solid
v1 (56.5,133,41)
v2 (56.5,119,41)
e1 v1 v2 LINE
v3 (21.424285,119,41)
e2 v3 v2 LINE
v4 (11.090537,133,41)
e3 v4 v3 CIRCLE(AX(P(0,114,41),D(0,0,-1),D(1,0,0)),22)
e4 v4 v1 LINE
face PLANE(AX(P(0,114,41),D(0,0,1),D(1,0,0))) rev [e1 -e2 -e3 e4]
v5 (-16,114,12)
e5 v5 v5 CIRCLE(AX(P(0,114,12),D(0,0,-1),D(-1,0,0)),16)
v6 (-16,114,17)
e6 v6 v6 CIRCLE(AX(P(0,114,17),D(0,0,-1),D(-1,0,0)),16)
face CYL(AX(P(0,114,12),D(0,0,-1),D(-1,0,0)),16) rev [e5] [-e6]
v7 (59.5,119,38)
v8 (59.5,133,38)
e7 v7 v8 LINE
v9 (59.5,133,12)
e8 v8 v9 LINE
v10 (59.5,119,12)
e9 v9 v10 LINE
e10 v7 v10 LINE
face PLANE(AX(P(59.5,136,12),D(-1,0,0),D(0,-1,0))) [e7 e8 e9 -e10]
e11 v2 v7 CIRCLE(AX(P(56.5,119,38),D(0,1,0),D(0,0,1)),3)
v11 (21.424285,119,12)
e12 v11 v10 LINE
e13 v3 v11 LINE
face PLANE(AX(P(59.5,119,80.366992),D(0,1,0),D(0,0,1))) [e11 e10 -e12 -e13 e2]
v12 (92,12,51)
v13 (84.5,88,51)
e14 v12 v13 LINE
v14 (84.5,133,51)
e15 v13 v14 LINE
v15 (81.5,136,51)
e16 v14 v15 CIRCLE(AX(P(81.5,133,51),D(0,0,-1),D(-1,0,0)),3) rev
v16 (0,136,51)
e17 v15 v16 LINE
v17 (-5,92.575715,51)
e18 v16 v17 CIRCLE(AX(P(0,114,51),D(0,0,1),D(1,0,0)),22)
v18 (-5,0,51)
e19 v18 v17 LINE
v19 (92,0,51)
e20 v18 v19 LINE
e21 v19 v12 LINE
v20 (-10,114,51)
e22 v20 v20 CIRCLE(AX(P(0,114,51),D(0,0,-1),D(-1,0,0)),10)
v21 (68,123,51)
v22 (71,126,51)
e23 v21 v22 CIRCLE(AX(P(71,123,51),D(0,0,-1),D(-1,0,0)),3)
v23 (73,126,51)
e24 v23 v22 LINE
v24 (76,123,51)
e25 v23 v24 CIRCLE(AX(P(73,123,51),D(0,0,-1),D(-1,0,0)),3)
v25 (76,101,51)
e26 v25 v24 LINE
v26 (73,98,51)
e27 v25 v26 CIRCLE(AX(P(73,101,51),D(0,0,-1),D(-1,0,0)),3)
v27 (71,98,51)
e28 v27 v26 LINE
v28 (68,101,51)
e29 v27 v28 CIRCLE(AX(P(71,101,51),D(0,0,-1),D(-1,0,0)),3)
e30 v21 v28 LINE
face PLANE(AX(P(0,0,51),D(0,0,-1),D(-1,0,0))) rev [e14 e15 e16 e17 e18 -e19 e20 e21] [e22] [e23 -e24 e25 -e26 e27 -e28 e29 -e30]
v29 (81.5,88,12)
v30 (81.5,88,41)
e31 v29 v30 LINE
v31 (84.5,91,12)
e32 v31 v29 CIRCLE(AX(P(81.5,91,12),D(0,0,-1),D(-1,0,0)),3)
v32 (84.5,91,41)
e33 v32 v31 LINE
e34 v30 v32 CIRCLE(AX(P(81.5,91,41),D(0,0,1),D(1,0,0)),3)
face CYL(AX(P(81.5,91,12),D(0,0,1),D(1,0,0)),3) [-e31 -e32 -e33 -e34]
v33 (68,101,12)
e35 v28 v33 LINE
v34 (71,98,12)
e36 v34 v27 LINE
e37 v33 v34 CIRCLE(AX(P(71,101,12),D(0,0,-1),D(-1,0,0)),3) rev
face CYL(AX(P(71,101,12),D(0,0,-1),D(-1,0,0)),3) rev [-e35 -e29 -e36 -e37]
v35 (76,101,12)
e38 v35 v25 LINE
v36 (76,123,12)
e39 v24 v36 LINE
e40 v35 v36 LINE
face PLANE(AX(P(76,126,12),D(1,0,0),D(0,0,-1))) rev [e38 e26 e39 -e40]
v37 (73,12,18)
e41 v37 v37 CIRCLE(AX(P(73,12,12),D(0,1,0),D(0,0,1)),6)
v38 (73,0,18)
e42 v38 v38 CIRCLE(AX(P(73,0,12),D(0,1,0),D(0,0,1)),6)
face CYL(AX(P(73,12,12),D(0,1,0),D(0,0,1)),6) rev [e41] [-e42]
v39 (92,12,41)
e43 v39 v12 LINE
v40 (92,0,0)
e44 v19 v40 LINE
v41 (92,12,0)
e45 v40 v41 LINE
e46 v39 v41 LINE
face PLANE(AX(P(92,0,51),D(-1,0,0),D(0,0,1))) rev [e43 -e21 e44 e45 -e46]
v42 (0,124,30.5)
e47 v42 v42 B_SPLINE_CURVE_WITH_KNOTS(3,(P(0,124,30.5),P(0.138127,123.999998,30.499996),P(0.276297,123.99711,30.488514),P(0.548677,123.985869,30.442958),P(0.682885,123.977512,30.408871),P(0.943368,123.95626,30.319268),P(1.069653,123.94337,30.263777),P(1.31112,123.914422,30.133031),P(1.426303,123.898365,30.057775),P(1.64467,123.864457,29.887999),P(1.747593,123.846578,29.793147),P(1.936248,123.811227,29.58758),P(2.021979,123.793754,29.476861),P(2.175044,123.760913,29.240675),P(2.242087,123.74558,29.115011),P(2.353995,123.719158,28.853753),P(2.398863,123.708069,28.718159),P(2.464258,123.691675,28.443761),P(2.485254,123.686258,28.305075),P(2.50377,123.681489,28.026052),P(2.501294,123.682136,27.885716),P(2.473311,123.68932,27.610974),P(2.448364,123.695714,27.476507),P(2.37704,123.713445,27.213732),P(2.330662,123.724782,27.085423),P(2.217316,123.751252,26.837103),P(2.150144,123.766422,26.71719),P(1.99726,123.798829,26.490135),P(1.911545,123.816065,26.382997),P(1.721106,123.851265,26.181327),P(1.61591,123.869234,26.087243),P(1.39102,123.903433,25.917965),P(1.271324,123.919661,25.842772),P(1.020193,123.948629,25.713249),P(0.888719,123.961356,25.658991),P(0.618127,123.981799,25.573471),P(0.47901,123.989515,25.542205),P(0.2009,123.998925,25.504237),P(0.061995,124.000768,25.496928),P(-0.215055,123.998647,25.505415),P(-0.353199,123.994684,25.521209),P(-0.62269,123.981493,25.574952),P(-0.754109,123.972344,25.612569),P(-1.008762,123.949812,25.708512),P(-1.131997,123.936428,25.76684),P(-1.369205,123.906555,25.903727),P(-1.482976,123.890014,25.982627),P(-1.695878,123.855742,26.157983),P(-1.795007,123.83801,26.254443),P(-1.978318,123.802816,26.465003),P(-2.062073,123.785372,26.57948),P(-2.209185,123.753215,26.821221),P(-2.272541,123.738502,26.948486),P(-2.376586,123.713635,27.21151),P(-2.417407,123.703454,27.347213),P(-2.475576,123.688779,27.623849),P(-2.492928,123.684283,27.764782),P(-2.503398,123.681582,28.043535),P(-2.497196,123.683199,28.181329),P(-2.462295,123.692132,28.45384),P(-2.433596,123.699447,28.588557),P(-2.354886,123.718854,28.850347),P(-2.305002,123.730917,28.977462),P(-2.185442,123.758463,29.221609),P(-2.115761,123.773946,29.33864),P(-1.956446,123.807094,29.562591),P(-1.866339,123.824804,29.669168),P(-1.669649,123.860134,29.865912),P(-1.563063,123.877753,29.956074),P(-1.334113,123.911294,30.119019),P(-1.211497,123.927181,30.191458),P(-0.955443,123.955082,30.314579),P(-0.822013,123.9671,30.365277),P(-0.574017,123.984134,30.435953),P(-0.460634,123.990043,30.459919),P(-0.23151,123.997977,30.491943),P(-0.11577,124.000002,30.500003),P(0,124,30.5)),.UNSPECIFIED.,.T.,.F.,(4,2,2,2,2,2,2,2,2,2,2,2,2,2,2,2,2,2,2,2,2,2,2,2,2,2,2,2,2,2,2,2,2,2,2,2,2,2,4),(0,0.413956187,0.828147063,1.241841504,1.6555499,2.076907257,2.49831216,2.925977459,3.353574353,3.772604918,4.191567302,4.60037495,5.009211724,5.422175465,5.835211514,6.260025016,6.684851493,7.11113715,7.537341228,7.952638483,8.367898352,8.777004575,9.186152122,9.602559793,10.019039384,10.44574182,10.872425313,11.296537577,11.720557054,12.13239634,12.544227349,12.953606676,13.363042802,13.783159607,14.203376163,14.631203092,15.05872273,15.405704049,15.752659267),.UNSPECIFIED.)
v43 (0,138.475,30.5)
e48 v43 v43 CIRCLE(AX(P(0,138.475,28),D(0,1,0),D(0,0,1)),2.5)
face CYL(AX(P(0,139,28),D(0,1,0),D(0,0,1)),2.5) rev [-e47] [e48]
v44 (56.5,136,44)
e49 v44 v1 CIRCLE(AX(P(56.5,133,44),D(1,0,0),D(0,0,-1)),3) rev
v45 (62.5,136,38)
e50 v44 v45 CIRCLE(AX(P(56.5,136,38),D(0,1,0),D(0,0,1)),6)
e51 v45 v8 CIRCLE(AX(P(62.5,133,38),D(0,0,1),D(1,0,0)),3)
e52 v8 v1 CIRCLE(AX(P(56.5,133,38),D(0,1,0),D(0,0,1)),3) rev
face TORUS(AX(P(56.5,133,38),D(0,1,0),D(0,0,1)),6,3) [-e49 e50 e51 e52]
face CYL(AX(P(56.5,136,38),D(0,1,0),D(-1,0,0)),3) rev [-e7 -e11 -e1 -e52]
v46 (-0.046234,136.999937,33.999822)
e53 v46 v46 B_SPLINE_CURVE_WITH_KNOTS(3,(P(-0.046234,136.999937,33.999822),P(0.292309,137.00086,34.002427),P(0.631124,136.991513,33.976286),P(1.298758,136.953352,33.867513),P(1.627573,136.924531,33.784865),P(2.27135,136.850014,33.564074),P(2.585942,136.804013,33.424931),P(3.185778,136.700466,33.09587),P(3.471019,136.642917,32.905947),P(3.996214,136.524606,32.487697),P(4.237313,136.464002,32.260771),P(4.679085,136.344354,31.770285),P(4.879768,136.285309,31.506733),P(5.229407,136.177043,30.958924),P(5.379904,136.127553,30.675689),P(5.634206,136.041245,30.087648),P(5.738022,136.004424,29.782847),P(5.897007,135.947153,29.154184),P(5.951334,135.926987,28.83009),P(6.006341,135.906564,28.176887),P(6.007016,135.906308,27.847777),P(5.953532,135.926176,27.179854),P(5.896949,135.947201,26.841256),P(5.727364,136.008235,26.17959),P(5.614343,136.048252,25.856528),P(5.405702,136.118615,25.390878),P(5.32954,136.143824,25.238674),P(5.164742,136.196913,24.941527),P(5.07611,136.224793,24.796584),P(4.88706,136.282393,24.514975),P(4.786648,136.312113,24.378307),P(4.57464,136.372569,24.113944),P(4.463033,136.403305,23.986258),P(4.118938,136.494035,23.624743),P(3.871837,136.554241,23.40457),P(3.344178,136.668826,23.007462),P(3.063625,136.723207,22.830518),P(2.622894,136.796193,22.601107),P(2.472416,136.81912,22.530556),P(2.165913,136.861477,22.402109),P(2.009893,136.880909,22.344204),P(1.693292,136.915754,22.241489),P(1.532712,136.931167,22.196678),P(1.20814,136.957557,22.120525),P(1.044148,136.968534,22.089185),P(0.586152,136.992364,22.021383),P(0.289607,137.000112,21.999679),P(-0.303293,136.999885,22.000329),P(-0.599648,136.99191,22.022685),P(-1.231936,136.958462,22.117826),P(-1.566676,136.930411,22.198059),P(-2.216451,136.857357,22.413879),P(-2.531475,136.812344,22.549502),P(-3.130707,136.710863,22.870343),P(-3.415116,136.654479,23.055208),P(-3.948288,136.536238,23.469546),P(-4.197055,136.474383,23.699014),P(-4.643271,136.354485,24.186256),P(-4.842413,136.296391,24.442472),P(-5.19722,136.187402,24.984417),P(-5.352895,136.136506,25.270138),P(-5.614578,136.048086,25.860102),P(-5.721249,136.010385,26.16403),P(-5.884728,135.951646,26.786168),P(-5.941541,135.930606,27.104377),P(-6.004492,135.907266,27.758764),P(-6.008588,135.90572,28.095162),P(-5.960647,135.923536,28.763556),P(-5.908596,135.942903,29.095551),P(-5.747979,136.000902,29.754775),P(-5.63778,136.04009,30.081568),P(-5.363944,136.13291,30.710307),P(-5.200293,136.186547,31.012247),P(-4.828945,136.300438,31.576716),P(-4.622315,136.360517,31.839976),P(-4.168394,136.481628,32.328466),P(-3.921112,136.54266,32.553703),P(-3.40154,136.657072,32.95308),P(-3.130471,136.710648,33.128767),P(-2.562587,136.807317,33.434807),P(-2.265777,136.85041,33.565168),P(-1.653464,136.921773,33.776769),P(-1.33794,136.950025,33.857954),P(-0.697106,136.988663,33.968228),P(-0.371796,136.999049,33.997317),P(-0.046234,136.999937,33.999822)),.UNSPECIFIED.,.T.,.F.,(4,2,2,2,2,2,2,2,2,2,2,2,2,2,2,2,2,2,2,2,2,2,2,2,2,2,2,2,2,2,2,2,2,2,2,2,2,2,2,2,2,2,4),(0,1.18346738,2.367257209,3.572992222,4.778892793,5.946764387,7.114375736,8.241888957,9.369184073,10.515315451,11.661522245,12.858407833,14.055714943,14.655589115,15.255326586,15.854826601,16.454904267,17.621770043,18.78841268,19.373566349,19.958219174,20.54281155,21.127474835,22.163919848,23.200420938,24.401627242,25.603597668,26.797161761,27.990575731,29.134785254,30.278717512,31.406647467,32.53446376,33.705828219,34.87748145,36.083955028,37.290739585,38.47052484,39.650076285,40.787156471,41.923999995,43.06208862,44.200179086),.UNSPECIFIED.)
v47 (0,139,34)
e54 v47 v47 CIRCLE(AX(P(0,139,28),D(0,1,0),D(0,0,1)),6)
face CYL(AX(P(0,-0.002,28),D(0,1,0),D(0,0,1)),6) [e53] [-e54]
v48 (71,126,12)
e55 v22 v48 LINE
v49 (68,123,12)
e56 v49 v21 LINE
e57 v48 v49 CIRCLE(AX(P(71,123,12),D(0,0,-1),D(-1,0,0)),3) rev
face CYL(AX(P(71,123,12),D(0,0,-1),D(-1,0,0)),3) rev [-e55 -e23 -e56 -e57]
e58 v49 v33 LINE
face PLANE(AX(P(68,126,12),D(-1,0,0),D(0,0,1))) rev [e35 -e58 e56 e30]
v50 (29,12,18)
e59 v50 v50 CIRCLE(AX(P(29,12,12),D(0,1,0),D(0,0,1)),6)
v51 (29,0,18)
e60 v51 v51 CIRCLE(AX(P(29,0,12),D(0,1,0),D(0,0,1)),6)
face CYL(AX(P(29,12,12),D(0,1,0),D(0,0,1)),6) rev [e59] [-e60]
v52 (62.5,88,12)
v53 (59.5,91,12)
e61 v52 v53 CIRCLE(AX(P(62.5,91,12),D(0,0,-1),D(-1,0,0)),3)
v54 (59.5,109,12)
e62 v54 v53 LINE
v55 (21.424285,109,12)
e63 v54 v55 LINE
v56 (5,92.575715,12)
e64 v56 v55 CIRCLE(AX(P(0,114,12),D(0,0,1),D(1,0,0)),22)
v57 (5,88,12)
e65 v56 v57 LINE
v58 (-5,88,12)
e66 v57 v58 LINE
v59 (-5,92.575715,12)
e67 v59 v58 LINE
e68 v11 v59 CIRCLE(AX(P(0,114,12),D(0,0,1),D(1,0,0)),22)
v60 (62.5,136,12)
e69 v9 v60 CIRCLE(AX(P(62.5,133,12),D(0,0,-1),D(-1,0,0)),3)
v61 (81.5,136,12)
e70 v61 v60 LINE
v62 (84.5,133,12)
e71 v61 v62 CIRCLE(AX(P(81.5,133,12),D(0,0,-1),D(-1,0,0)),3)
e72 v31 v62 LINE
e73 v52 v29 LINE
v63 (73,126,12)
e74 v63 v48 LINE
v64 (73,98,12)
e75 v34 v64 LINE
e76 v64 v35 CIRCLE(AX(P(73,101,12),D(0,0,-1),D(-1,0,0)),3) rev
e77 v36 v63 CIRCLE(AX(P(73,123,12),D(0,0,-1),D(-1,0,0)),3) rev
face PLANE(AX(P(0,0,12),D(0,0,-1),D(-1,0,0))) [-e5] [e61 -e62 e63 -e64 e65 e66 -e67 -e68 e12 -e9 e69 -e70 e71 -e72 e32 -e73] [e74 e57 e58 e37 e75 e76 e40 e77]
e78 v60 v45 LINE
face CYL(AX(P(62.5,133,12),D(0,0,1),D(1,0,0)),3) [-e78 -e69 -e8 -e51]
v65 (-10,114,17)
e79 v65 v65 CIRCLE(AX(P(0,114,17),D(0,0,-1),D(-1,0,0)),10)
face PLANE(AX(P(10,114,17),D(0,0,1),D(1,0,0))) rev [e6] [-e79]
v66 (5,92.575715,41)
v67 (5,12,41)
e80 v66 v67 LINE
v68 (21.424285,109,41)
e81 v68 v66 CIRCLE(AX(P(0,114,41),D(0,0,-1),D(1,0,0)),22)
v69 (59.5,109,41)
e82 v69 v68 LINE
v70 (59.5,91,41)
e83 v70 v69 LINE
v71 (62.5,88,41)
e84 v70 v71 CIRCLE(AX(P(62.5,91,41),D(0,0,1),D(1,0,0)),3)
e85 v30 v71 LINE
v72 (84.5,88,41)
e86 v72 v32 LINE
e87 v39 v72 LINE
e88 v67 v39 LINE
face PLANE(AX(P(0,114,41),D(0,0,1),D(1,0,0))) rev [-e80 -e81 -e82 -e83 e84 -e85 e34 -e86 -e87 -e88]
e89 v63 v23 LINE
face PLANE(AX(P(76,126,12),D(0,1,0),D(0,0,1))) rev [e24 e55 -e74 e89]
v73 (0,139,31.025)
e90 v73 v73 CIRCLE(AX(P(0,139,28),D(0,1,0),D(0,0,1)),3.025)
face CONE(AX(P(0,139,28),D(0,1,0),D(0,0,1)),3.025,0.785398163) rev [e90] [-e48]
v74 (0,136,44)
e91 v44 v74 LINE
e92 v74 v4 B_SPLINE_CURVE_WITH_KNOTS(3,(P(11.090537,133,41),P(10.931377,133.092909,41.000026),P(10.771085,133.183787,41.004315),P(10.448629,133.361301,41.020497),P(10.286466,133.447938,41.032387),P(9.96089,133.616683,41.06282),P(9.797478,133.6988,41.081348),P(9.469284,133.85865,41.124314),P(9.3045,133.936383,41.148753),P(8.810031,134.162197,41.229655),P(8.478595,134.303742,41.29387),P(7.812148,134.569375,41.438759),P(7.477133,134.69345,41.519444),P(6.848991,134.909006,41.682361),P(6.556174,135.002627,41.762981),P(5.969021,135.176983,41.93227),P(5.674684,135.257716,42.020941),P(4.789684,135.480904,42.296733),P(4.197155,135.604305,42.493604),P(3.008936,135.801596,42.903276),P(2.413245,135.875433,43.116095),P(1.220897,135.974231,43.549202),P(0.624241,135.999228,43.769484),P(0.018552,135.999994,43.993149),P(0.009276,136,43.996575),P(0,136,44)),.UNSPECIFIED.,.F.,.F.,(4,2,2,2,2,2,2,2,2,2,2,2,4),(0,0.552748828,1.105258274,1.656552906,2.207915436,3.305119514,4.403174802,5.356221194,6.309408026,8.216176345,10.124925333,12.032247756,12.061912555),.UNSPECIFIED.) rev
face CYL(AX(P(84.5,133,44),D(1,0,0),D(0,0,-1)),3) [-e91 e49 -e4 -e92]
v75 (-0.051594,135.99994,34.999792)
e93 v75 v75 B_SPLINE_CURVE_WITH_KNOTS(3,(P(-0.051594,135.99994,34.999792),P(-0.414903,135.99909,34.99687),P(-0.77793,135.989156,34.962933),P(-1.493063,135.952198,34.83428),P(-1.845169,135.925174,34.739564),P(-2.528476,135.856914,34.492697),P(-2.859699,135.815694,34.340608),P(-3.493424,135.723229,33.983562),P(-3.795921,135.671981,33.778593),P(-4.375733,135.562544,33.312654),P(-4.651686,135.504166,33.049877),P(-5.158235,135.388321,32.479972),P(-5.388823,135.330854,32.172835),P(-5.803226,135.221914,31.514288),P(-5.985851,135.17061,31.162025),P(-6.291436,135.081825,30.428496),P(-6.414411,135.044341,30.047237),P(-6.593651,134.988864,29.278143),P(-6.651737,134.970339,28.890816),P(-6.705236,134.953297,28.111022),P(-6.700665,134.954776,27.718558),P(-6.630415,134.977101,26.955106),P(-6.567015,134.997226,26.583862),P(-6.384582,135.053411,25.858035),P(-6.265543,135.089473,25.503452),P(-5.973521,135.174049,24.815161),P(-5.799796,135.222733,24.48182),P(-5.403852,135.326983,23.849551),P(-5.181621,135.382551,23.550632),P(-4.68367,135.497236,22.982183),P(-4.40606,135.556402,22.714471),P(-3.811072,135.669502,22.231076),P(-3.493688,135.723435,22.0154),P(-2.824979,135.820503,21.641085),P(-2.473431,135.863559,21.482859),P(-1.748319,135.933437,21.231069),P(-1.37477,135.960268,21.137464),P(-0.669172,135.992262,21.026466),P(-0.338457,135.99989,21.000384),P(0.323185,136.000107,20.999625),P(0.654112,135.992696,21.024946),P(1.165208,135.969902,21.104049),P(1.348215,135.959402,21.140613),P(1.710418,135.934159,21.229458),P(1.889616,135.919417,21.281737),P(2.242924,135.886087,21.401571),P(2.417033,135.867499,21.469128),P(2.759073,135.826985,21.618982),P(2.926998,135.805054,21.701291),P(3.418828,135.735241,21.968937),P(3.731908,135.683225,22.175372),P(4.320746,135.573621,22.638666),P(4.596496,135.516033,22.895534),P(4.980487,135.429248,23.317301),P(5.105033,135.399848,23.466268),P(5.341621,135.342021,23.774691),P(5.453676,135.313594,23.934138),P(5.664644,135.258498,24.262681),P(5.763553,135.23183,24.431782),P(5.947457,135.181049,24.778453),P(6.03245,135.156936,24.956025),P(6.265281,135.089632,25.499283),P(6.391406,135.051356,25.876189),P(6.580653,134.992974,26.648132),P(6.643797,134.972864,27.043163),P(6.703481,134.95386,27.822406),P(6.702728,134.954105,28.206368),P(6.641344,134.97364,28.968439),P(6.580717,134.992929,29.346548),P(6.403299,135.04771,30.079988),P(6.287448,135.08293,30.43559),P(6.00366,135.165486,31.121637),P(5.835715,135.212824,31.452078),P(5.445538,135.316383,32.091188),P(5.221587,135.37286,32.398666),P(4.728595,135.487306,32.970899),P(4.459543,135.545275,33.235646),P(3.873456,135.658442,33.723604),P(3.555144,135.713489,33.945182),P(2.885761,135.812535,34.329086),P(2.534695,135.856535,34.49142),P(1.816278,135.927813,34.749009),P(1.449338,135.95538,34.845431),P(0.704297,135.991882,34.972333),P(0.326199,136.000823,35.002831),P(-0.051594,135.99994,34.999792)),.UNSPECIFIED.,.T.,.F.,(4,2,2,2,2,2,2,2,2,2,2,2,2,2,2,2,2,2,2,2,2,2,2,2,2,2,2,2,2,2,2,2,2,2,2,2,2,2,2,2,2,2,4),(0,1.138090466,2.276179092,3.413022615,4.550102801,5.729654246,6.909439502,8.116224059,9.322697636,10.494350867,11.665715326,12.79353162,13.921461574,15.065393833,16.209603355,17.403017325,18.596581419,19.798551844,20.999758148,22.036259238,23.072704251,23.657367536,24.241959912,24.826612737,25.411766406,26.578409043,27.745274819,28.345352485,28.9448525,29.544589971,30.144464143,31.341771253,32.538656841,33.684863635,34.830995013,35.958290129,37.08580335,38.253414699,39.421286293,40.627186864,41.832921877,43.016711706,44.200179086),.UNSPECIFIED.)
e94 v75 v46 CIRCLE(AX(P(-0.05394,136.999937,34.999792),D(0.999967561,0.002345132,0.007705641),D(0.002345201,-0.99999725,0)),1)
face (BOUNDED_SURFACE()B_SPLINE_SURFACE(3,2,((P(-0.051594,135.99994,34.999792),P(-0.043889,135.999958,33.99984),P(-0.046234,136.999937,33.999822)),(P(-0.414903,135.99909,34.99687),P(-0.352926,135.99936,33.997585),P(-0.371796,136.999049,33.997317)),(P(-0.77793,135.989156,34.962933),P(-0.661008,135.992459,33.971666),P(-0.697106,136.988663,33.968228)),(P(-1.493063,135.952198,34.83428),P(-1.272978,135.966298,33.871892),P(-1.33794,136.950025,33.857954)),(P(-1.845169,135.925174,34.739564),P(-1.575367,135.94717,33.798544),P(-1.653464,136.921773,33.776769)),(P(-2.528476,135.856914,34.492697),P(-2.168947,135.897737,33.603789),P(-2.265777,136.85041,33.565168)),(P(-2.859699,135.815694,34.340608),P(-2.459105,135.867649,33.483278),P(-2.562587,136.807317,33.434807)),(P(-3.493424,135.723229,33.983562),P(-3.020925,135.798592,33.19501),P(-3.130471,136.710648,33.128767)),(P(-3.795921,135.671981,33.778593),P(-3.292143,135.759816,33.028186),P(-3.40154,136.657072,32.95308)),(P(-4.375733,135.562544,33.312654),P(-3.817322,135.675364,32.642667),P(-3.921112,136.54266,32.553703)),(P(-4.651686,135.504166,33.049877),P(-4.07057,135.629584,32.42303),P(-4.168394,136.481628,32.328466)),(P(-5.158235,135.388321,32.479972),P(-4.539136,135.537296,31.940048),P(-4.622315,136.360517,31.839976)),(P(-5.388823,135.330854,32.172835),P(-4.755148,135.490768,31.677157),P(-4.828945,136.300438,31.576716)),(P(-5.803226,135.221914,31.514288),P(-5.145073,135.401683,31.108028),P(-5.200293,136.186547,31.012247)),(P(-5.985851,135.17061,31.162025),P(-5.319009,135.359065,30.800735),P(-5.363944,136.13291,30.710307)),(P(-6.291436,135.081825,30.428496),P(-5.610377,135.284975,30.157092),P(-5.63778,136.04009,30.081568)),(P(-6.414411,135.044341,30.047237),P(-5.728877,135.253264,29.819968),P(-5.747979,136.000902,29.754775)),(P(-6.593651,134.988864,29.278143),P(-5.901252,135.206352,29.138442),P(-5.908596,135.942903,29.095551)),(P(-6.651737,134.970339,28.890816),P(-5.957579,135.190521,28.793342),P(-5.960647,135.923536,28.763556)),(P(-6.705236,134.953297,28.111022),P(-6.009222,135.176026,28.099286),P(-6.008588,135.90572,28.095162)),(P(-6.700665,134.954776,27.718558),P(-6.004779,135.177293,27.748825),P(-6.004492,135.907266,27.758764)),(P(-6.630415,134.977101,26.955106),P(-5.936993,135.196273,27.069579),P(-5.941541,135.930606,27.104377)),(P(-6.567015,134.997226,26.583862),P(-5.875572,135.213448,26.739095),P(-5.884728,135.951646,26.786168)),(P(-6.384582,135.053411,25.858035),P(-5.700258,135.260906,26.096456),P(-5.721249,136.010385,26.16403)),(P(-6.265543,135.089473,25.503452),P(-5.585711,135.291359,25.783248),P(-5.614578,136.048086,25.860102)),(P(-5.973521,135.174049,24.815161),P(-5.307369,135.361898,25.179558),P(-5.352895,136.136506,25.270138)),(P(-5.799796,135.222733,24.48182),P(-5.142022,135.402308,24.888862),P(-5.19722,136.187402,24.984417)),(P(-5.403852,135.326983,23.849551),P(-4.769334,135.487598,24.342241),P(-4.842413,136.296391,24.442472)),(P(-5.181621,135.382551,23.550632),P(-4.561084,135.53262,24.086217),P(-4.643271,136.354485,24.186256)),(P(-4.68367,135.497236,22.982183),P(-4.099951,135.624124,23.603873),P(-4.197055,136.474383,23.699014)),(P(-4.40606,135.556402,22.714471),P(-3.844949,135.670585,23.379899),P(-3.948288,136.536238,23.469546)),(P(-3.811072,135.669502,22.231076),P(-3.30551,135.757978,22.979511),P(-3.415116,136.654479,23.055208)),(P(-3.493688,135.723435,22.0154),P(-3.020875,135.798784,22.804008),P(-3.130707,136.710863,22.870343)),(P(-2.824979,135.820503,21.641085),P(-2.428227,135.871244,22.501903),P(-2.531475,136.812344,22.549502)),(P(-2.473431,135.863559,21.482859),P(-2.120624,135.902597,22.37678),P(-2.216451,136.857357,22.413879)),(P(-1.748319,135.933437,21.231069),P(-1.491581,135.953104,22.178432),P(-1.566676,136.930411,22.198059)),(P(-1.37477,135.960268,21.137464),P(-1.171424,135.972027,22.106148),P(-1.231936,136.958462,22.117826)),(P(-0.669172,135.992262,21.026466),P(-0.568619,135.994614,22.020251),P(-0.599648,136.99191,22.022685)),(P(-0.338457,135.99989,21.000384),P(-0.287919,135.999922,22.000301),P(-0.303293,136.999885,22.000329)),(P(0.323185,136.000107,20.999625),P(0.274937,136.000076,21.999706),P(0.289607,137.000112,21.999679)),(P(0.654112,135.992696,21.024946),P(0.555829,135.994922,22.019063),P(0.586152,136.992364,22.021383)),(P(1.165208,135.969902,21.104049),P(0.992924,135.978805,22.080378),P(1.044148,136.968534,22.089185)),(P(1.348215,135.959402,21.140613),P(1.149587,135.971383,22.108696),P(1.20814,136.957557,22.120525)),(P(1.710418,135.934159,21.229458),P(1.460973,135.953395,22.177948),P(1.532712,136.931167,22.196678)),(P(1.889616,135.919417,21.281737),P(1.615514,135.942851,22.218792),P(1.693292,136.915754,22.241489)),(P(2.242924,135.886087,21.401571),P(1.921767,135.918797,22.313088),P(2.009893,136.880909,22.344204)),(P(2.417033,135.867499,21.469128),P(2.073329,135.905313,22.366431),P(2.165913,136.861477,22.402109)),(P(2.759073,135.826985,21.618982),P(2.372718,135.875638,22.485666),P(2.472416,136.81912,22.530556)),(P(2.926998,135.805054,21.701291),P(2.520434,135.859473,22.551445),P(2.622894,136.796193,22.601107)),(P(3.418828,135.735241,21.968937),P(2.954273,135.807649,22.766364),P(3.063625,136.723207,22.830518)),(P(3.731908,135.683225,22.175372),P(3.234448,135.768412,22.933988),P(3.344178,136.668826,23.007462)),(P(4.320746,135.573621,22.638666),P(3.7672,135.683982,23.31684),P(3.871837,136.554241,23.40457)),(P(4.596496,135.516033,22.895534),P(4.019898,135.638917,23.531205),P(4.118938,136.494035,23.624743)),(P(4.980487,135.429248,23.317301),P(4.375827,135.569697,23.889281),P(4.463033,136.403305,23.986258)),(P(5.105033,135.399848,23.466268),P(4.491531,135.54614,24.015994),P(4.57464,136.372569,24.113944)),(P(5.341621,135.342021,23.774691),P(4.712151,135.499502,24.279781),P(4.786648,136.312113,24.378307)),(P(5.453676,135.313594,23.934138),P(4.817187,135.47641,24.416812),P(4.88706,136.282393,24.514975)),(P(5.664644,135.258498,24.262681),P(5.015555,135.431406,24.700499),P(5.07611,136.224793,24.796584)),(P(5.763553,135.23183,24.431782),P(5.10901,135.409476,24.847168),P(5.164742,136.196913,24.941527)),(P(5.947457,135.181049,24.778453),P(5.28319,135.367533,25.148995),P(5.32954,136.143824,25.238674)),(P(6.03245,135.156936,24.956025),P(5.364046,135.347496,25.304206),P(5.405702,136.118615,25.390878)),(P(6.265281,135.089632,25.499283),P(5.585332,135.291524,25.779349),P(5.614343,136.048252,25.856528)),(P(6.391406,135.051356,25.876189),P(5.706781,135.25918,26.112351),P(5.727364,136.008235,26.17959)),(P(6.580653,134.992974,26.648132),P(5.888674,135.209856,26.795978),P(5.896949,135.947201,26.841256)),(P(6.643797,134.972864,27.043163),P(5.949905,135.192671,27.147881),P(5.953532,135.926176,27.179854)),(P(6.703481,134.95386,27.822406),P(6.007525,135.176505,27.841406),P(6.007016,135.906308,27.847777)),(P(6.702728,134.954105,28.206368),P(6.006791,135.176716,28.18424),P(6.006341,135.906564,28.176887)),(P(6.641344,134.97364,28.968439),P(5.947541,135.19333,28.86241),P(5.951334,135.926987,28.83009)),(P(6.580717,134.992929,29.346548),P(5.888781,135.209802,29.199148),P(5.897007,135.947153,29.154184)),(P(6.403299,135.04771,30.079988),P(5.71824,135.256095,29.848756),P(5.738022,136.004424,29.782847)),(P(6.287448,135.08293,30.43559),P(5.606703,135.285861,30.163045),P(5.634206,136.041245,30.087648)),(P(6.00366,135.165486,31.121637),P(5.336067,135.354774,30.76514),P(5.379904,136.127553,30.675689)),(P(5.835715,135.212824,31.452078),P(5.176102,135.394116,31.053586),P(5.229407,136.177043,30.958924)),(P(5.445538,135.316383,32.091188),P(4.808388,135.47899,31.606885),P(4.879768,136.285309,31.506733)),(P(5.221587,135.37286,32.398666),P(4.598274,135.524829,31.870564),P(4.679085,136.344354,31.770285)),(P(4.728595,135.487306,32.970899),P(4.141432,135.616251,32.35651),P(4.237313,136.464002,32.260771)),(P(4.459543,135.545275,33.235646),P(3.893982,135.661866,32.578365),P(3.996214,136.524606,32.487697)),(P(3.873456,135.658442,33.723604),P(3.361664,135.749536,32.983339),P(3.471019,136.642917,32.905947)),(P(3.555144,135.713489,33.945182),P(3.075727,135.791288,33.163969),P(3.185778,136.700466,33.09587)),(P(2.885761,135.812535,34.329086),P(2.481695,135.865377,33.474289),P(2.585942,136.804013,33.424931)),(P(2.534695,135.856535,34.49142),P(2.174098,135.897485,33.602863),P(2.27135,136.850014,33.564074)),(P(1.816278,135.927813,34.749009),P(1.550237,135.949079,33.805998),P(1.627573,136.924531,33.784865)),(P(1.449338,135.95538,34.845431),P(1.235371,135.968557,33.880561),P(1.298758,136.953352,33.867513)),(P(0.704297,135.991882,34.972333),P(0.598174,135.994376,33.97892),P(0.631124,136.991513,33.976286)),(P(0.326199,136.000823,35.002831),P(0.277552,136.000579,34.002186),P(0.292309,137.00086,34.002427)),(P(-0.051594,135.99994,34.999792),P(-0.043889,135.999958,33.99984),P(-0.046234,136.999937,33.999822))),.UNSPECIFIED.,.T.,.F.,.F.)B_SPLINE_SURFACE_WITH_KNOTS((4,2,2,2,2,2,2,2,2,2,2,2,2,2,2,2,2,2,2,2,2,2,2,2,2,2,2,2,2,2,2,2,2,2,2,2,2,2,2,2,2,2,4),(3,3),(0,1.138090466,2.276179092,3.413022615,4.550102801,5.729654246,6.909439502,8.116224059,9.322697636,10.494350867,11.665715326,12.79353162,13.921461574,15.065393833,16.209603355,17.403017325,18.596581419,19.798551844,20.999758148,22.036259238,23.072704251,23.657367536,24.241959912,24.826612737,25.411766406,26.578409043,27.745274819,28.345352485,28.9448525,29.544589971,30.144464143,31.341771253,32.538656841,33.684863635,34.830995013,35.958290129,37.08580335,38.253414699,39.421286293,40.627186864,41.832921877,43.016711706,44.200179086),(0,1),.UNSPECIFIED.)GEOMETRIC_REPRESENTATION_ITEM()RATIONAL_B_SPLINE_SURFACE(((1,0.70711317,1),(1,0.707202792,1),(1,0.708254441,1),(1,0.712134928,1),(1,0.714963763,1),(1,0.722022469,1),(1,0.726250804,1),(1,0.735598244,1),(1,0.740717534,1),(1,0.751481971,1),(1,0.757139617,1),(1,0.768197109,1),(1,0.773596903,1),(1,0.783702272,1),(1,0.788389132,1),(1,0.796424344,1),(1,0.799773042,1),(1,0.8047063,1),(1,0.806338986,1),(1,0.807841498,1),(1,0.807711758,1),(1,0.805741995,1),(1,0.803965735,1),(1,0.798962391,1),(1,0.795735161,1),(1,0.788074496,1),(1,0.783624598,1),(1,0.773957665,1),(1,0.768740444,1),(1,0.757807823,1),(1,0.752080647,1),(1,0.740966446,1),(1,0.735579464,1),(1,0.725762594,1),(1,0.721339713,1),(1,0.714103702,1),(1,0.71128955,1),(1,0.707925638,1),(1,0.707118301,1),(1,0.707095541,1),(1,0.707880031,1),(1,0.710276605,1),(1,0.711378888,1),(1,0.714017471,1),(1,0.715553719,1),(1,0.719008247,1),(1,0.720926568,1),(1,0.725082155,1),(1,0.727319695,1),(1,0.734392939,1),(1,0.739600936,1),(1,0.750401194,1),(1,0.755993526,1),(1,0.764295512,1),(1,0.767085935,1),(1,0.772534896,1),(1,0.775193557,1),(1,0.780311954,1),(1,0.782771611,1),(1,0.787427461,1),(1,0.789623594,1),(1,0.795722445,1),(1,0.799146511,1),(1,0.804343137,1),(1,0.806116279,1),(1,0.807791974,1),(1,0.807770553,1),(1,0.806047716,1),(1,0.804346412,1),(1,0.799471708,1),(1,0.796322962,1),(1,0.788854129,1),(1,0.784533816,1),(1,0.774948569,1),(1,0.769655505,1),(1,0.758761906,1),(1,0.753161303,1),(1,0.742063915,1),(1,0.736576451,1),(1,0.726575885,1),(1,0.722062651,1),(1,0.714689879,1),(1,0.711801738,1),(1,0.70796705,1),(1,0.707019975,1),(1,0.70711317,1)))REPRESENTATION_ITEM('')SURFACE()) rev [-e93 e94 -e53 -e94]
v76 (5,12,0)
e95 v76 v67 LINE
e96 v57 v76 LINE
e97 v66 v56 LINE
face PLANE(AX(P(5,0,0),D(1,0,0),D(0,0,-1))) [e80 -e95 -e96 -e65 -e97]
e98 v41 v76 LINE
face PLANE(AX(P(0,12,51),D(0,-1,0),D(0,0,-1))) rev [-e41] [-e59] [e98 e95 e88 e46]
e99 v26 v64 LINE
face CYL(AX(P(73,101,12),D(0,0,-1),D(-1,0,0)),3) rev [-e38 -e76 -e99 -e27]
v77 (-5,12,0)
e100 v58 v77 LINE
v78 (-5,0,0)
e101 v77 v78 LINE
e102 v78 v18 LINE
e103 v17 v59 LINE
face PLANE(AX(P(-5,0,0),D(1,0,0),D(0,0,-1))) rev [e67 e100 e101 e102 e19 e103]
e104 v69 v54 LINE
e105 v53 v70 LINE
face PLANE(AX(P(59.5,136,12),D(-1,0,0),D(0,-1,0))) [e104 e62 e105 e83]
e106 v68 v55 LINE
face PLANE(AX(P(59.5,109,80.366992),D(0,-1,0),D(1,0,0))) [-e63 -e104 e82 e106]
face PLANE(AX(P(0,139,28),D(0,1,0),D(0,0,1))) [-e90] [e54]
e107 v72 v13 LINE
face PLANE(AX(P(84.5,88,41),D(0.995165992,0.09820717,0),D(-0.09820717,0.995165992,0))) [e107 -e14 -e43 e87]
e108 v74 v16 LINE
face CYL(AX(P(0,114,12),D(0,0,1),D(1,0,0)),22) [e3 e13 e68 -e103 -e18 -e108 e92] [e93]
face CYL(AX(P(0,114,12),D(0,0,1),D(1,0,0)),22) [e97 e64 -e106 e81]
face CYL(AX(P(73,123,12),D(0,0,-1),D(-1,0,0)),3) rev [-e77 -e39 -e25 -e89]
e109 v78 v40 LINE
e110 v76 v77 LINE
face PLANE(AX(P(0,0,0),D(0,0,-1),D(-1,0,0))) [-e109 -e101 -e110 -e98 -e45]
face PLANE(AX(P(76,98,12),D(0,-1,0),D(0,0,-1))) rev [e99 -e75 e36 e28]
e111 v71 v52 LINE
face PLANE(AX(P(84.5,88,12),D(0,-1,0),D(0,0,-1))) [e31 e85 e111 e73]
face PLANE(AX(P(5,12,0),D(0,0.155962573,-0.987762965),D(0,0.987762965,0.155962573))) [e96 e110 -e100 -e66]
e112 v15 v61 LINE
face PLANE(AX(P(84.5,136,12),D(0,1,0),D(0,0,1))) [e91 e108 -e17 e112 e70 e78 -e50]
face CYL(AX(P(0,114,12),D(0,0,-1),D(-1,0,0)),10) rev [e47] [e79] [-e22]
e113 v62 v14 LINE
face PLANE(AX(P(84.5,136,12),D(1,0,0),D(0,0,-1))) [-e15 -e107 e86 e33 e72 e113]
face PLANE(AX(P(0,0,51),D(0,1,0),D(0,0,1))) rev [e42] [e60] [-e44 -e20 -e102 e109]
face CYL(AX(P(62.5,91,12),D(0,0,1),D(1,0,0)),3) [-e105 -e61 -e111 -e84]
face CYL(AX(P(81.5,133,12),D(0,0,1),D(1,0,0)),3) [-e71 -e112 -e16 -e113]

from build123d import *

# Parameters (mm, degrees)
SKETCH1_W                = 92
SKETCH1_H                = 12
BOSS_EXTRUDE1_DEPTH      = 51
SKETCH9_R                = 22
BOSS_EXTRUDE4_DEPTH      = 39
SKETCH9_W                = 25
SKETCH9_H                = 48
SKETCH9_W_2              = 8
SKETCH9_H_2              = 28
BOSS_EXTRUDE4_2_DEPTH    = 39
BOSS_EXTRUDE5_DEPTH      = 5
BOSS_EXTRUDE6_DEPTH      = 10
BOSS_EXTRUDE7_START      = -29
BOSS_EXTRUDE7_DEPTH      = 29
BOSS_EXTRUDE8_REACH      = 176.316
BOSS_EXTRUDE8_END_RADIUS = 22
SKETCH15_R               = 6
FILLET1_R                = 3
FILLET2_R                = 3
FILLET3_R                = 3
FILLET4_R                = 1
HOLE3_D                  = 12
HOLE3_DEPTH              = 12
LPATTERN1_COUNT          = 2
LPATTERN1_PITCH          = 44


# Read off the part's stored shape, not the designer's step: M6 Tapped Hole1
with BuildPart() as part:
    # Sketch1 → Boss-Extrude1 (new body)
    with BuildSketch(Plane.XY):
        with Locations((46, 6)):
            Rectangle(SKETCH1_W, SKETCH1_H)
    extrude(amount=BOSS_EXTRUDE1_DEPTH)



with BuildPart() as body_2:
    # Sketch9 → Boss-Extrude4 (new body)
    with BuildSketch(Plane.XY.offset(51)):
        with Locations((0, 114)):
            Circle(SKETCH9_R)
    extrude(amount=-BOSS_EXTRUDE4_DEPTH)


with BuildPart() as body_3:
    # Sketch9 → Boss-Extrude4 2 (new body)
    with BuildSketch(Plane.XY.offset(51)):
        with Locations((72, 112)):
            Rectangle(SKETCH9_W, SKETCH9_H)
        with Locations((72, 112)):
            Rectangle(SKETCH9_W_2, SKETCH9_H_2, mode=Mode.SUBTRACT)
    extrude(amount=-BOSS_EXTRUDE4_2_DEPTH)


with BuildPart() as part_1:
    add(part.part)

    add(body_2.part)  # Boss-Extrude5 merges body 2
    # Sketch10 → Boss-Extrude5 (add, symmetric)
    with BuildSketch(Plane.ZY):
        Polygon((0, 0), (0, 12), (12, 88), (12, 94), (51, 94), (51, 88), (51, 12), (51, 0), align=None)
    extrude(amount=BOSS_EXTRUDE5_DEPTH, both=True)

    # Sketch12 → Hole2 (revolve, cut)
    with BuildSketch(Plane(origin=(0, 114, 12), x_dir=(0, 1, 0), z_dir=(1, 0, 0))):
        Polygon((0, 0), (0, 39.001), (10, 39.001), (10, 5), (16, 5), (16, 0), align=None)
    revolve(axis=Axis((0, 114, 122), (0, 0, -1)), mode=Mode.SUBTRACT)


    add(body_3.part)  # Boss-Extrude6 merges body 3
    # Sketch13 → Boss-Extrude6 (add)
    with BuildSketch(Plane.XY.offset(51)):
        with BuildLine():
            Line((92, 12), (5, 12))
            Line((5, 12), (5, 92.575714714))
            ThreePointArc((5, 92.575714714), (21.85559741, 116.516517804), (0, 136))
            Line((0, 136), (59.5, 136))
            Line((59.5, 136), (59.5, 88))
            Line((59.5, 88), (84.5, 88))
            Line((84.5, 88), (92, 12))
        make_face()
    extrude(amount=-BOSS_EXTRUDE6_DEPTH)

    # Sketch14 → Boss-Extrude7 (add)
    with BuildSketch(Plane(origin=(0, 0, 12), x_dir=(-1, 0, 0), z_dir=(0, 0, -1)).offset(BOSS_EXTRUDE7_START)):
        with BuildLine():
            Line((-59.5, 119), (-59.5, 109))
            Line((-59.5, 109), (-21.424285286, 109))
            ThreePointArc((-21.424285286, 109), (-22, 114), (-21.424285286, 119))
            Line((-21.424285286, 119), (-59.5, 119))
        make_face()
    extrude(amount=BOSS_EXTRUDE7_DEPTH)

    # Boss-Extrude8: up to this cylinder (the profile starts outside it)
    boss_extrude8_end = Plane(origin=(0, 114, 28), z_dir=(0, 0, 1)) * Cylinder(BOSS_EXTRUDE8_END_RADIUS, 397.632, mode=Mode.PRIVATE)
    # Sketch15 → Boss-Extrude8 (add, up to the surface)
    with BuildSketch(Plane(origin=(0, 139, 0), x_dir=(1, 0, 0), z_dir=(0, 1, 0)), mode=Mode.PRIVATE) as boss_extrude8_sk1:
        with Locations(Location((0, -28, 0), (0, 0, 270))):
            Circle(SKETCH15_R)
    boss_extrude8_tool1 = extrude(boss_extrude8_sk1.sketch, amount=-BOSS_EXTRUDE8_REACH, mode=Mode.PRIVATE) - boss_extrude8_end
    add(boss_extrude8_tool1.solids().sort_by_distance((0, 139, 28))[0])

    # M6 Tapped Hole1 outline → M6 Tapped Hole1 (revolve, cut)
    with BuildSketch(Plane.XY.offset(28)):
        Polygon((0, 123.682411551), (2.5, 123.682411551), (2.5, 138.475), (3.025, 139), (0, 139), align=None)
    revolve(axis=Axis((0, 0, 28), (0, 1, 0)), mode=Mode.SUBTRACT)

    # Fillet1
    # the kernel refuses this fillet: 3 mm, written as the material it adds along each edge
    with BuildSketch(Plane(origin=(59.5, 136, 41), x_dir=(-1, 0, 0), z_dir=(0, -1, 0))) as fillet1_piece_1:
        with BuildLine():
            CenterArc((FILLET1_R, FILLET1_R), FILLET1_R, 180, 90)
            Line((0, FILLET1_R), (0, 0))
            Line((0, 0), (FILLET1_R, 0))
        make_face()
    extrude(amount=24.5)
    # the kernel refuses this fillet: 3 mm, written as the material it takes off along each edge
    with BuildSketch(Plane(origin=(59.5, 88, 41), x_dir=(0, 1, 0), z_dir=(0, 0, -1))) as fillet1_2_piece_1:
        with BuildLine():
            CenterArc((FILLET1_R, FILLET1_R), FILLET1_R, 180, 90)
            Line((0, FILLET1_R), (0, 0))
            Line((0, 0), (FILLET1_R, 0))
        make_face()
    extrude(amount=36.5, mode=Mode.SUBTRACT)
    # the kernel refuses this fillet: 3 mm, written as the material it takes off along each edge
    with BuildSketch(Plane(origin=(-7.5, 136, 41), x_dir=(0, 0, 1), z_dir=(1, 0, 0))) as fillet1_3_piece_1_section:
        with BuildLine():
            CenterArc((FILLET1_R, FILLET1_R), FILLET1_R, 180, 90)
            Line((0, FILLET1_R), (0, 0))
            Line((0, 0), (FILLET1_R, 0))
        make_face()
    fillet1_3_piece_1 = extrude(amount=64, mode=Mode.PRIVATE)
    fillet1_3_piece_1 = fillet1_3_piece_1 - Plane(origin=(0, 114, 41.685678885), x_dir=(1, 0, 0), z_dir=(0, 0, 1)) * Cylinder(22, 140, mode=Mode.PRIVATE)
    add(fillet1_3_piece_1, mode=Mode.SUBTRACT)
    with BuildSketch(Plane(origin=(59.5, 136, 38), x_dir=(1, 0, 0), z_dir=(0, 0, -1))) as fillet1_3_piece_2:
        with BuildLine():
            CenterArc((FILLET1_R, FILLET1_R), FILLET1_R, 180, 90)
            Line((0, FILLET1_R), (0, 0))
            Line((0, 0), (FILLET1_R, 0))
        make_face()
    extrude(amount=33.5, mode=Mode.SUBTRACT)
    with BuildSketch(Plane(origin=(56.5, 136, 38), x_dir=(0, 0, 1), z_dir=(-1, 0, 0))) as fillet1_3_piece_3:
        with BuildLine():
            CenterArc((3 + FILLET1_R, -FILLET1_R), FILLET1_R, 90, 90)
            Line((3, -FILLET1_R), (3, 0))
            Line((3, 0), (3 + FILLET1_R, 0))
        make_face()
    revolve(axis=Axis((56.5, 136, 38), (0, 1, 0)), revolution_arc=90, mode=Mode.SUBTRACT)

    # Fillet2
    fillet2_edges = [part_1.edges().sort_by_distance(p)[0] for p in [
        (68, 98, 31.5),
        (76, 98, 31.5),
        (76, 126, 31.5),
        (68, 126, 31.5),
    ]]
    fillet(fillet2_edges, radius=FILLET2_R)

    # Fillet3
    # the kernel refuses this fillet: 3 mm, written as the material it takes off along each edge
    with BuildSketch(Plane(origin=(84.5, 136, 58.5), x_dir=(-1, 0, 0), z_dir=(0, 0, -1))) as fillet3_piece_1:
        with BuildLine():
            CenterArc((FILLET3_R, -FILLET3_R), FILLET3_R, 90, 90)
            Line((0, -FILLET3_R), (0, 0))
            Line((0, 0), (FILLET3_R, 0))
        make_face()
    extrude(amount=54, mode=Mode.SUBTRACT)
    with BuildSketch(Plane(origin=(84.5, 88, 41), x_dir=(0, 1, 0), z_dir=(0, 0, -1))) as fillet3_piece_2:
        with BuildLine():
            CenterArc((FILLET3_R, -FILLET3_R), FILLET3_R, 90, 90)
            Line((0, -FILLET3_R), (0, 0))
            Line((0, 0), (FILLET3_R, 0))
        make_face()
    extrude(amount=36.5, mode=Mode.SUBTRACT)

    # Fillet4
    fillet4_edges = [part_1.edges().sort_by_distance(p)[0] for p in [
        (1e-09, 135.999999999, 21.999999993),
    ]]
    fillet(fillet4_edges, radius=FILLET4_R)

    # Hole3
    with Locations(Plane(origin=(0, 12, 0), x_dir=(1, 0, 0), z_dir=(0, 1, 0))):
        with Locations((73, -12)):
            hole3 = Hole(HOLE3_D / 2, depth=HOLE3_DEPTH)

    # LPattern1: Hole3 ×2
    with Locations(*[(-i * LPATTERN1_PITCH, 0, 0) for i in range(1, LPATTERN1_COUNT)]):
        add(hole3, mode=Mode.SUBTRACT)


solid = part_1.part
